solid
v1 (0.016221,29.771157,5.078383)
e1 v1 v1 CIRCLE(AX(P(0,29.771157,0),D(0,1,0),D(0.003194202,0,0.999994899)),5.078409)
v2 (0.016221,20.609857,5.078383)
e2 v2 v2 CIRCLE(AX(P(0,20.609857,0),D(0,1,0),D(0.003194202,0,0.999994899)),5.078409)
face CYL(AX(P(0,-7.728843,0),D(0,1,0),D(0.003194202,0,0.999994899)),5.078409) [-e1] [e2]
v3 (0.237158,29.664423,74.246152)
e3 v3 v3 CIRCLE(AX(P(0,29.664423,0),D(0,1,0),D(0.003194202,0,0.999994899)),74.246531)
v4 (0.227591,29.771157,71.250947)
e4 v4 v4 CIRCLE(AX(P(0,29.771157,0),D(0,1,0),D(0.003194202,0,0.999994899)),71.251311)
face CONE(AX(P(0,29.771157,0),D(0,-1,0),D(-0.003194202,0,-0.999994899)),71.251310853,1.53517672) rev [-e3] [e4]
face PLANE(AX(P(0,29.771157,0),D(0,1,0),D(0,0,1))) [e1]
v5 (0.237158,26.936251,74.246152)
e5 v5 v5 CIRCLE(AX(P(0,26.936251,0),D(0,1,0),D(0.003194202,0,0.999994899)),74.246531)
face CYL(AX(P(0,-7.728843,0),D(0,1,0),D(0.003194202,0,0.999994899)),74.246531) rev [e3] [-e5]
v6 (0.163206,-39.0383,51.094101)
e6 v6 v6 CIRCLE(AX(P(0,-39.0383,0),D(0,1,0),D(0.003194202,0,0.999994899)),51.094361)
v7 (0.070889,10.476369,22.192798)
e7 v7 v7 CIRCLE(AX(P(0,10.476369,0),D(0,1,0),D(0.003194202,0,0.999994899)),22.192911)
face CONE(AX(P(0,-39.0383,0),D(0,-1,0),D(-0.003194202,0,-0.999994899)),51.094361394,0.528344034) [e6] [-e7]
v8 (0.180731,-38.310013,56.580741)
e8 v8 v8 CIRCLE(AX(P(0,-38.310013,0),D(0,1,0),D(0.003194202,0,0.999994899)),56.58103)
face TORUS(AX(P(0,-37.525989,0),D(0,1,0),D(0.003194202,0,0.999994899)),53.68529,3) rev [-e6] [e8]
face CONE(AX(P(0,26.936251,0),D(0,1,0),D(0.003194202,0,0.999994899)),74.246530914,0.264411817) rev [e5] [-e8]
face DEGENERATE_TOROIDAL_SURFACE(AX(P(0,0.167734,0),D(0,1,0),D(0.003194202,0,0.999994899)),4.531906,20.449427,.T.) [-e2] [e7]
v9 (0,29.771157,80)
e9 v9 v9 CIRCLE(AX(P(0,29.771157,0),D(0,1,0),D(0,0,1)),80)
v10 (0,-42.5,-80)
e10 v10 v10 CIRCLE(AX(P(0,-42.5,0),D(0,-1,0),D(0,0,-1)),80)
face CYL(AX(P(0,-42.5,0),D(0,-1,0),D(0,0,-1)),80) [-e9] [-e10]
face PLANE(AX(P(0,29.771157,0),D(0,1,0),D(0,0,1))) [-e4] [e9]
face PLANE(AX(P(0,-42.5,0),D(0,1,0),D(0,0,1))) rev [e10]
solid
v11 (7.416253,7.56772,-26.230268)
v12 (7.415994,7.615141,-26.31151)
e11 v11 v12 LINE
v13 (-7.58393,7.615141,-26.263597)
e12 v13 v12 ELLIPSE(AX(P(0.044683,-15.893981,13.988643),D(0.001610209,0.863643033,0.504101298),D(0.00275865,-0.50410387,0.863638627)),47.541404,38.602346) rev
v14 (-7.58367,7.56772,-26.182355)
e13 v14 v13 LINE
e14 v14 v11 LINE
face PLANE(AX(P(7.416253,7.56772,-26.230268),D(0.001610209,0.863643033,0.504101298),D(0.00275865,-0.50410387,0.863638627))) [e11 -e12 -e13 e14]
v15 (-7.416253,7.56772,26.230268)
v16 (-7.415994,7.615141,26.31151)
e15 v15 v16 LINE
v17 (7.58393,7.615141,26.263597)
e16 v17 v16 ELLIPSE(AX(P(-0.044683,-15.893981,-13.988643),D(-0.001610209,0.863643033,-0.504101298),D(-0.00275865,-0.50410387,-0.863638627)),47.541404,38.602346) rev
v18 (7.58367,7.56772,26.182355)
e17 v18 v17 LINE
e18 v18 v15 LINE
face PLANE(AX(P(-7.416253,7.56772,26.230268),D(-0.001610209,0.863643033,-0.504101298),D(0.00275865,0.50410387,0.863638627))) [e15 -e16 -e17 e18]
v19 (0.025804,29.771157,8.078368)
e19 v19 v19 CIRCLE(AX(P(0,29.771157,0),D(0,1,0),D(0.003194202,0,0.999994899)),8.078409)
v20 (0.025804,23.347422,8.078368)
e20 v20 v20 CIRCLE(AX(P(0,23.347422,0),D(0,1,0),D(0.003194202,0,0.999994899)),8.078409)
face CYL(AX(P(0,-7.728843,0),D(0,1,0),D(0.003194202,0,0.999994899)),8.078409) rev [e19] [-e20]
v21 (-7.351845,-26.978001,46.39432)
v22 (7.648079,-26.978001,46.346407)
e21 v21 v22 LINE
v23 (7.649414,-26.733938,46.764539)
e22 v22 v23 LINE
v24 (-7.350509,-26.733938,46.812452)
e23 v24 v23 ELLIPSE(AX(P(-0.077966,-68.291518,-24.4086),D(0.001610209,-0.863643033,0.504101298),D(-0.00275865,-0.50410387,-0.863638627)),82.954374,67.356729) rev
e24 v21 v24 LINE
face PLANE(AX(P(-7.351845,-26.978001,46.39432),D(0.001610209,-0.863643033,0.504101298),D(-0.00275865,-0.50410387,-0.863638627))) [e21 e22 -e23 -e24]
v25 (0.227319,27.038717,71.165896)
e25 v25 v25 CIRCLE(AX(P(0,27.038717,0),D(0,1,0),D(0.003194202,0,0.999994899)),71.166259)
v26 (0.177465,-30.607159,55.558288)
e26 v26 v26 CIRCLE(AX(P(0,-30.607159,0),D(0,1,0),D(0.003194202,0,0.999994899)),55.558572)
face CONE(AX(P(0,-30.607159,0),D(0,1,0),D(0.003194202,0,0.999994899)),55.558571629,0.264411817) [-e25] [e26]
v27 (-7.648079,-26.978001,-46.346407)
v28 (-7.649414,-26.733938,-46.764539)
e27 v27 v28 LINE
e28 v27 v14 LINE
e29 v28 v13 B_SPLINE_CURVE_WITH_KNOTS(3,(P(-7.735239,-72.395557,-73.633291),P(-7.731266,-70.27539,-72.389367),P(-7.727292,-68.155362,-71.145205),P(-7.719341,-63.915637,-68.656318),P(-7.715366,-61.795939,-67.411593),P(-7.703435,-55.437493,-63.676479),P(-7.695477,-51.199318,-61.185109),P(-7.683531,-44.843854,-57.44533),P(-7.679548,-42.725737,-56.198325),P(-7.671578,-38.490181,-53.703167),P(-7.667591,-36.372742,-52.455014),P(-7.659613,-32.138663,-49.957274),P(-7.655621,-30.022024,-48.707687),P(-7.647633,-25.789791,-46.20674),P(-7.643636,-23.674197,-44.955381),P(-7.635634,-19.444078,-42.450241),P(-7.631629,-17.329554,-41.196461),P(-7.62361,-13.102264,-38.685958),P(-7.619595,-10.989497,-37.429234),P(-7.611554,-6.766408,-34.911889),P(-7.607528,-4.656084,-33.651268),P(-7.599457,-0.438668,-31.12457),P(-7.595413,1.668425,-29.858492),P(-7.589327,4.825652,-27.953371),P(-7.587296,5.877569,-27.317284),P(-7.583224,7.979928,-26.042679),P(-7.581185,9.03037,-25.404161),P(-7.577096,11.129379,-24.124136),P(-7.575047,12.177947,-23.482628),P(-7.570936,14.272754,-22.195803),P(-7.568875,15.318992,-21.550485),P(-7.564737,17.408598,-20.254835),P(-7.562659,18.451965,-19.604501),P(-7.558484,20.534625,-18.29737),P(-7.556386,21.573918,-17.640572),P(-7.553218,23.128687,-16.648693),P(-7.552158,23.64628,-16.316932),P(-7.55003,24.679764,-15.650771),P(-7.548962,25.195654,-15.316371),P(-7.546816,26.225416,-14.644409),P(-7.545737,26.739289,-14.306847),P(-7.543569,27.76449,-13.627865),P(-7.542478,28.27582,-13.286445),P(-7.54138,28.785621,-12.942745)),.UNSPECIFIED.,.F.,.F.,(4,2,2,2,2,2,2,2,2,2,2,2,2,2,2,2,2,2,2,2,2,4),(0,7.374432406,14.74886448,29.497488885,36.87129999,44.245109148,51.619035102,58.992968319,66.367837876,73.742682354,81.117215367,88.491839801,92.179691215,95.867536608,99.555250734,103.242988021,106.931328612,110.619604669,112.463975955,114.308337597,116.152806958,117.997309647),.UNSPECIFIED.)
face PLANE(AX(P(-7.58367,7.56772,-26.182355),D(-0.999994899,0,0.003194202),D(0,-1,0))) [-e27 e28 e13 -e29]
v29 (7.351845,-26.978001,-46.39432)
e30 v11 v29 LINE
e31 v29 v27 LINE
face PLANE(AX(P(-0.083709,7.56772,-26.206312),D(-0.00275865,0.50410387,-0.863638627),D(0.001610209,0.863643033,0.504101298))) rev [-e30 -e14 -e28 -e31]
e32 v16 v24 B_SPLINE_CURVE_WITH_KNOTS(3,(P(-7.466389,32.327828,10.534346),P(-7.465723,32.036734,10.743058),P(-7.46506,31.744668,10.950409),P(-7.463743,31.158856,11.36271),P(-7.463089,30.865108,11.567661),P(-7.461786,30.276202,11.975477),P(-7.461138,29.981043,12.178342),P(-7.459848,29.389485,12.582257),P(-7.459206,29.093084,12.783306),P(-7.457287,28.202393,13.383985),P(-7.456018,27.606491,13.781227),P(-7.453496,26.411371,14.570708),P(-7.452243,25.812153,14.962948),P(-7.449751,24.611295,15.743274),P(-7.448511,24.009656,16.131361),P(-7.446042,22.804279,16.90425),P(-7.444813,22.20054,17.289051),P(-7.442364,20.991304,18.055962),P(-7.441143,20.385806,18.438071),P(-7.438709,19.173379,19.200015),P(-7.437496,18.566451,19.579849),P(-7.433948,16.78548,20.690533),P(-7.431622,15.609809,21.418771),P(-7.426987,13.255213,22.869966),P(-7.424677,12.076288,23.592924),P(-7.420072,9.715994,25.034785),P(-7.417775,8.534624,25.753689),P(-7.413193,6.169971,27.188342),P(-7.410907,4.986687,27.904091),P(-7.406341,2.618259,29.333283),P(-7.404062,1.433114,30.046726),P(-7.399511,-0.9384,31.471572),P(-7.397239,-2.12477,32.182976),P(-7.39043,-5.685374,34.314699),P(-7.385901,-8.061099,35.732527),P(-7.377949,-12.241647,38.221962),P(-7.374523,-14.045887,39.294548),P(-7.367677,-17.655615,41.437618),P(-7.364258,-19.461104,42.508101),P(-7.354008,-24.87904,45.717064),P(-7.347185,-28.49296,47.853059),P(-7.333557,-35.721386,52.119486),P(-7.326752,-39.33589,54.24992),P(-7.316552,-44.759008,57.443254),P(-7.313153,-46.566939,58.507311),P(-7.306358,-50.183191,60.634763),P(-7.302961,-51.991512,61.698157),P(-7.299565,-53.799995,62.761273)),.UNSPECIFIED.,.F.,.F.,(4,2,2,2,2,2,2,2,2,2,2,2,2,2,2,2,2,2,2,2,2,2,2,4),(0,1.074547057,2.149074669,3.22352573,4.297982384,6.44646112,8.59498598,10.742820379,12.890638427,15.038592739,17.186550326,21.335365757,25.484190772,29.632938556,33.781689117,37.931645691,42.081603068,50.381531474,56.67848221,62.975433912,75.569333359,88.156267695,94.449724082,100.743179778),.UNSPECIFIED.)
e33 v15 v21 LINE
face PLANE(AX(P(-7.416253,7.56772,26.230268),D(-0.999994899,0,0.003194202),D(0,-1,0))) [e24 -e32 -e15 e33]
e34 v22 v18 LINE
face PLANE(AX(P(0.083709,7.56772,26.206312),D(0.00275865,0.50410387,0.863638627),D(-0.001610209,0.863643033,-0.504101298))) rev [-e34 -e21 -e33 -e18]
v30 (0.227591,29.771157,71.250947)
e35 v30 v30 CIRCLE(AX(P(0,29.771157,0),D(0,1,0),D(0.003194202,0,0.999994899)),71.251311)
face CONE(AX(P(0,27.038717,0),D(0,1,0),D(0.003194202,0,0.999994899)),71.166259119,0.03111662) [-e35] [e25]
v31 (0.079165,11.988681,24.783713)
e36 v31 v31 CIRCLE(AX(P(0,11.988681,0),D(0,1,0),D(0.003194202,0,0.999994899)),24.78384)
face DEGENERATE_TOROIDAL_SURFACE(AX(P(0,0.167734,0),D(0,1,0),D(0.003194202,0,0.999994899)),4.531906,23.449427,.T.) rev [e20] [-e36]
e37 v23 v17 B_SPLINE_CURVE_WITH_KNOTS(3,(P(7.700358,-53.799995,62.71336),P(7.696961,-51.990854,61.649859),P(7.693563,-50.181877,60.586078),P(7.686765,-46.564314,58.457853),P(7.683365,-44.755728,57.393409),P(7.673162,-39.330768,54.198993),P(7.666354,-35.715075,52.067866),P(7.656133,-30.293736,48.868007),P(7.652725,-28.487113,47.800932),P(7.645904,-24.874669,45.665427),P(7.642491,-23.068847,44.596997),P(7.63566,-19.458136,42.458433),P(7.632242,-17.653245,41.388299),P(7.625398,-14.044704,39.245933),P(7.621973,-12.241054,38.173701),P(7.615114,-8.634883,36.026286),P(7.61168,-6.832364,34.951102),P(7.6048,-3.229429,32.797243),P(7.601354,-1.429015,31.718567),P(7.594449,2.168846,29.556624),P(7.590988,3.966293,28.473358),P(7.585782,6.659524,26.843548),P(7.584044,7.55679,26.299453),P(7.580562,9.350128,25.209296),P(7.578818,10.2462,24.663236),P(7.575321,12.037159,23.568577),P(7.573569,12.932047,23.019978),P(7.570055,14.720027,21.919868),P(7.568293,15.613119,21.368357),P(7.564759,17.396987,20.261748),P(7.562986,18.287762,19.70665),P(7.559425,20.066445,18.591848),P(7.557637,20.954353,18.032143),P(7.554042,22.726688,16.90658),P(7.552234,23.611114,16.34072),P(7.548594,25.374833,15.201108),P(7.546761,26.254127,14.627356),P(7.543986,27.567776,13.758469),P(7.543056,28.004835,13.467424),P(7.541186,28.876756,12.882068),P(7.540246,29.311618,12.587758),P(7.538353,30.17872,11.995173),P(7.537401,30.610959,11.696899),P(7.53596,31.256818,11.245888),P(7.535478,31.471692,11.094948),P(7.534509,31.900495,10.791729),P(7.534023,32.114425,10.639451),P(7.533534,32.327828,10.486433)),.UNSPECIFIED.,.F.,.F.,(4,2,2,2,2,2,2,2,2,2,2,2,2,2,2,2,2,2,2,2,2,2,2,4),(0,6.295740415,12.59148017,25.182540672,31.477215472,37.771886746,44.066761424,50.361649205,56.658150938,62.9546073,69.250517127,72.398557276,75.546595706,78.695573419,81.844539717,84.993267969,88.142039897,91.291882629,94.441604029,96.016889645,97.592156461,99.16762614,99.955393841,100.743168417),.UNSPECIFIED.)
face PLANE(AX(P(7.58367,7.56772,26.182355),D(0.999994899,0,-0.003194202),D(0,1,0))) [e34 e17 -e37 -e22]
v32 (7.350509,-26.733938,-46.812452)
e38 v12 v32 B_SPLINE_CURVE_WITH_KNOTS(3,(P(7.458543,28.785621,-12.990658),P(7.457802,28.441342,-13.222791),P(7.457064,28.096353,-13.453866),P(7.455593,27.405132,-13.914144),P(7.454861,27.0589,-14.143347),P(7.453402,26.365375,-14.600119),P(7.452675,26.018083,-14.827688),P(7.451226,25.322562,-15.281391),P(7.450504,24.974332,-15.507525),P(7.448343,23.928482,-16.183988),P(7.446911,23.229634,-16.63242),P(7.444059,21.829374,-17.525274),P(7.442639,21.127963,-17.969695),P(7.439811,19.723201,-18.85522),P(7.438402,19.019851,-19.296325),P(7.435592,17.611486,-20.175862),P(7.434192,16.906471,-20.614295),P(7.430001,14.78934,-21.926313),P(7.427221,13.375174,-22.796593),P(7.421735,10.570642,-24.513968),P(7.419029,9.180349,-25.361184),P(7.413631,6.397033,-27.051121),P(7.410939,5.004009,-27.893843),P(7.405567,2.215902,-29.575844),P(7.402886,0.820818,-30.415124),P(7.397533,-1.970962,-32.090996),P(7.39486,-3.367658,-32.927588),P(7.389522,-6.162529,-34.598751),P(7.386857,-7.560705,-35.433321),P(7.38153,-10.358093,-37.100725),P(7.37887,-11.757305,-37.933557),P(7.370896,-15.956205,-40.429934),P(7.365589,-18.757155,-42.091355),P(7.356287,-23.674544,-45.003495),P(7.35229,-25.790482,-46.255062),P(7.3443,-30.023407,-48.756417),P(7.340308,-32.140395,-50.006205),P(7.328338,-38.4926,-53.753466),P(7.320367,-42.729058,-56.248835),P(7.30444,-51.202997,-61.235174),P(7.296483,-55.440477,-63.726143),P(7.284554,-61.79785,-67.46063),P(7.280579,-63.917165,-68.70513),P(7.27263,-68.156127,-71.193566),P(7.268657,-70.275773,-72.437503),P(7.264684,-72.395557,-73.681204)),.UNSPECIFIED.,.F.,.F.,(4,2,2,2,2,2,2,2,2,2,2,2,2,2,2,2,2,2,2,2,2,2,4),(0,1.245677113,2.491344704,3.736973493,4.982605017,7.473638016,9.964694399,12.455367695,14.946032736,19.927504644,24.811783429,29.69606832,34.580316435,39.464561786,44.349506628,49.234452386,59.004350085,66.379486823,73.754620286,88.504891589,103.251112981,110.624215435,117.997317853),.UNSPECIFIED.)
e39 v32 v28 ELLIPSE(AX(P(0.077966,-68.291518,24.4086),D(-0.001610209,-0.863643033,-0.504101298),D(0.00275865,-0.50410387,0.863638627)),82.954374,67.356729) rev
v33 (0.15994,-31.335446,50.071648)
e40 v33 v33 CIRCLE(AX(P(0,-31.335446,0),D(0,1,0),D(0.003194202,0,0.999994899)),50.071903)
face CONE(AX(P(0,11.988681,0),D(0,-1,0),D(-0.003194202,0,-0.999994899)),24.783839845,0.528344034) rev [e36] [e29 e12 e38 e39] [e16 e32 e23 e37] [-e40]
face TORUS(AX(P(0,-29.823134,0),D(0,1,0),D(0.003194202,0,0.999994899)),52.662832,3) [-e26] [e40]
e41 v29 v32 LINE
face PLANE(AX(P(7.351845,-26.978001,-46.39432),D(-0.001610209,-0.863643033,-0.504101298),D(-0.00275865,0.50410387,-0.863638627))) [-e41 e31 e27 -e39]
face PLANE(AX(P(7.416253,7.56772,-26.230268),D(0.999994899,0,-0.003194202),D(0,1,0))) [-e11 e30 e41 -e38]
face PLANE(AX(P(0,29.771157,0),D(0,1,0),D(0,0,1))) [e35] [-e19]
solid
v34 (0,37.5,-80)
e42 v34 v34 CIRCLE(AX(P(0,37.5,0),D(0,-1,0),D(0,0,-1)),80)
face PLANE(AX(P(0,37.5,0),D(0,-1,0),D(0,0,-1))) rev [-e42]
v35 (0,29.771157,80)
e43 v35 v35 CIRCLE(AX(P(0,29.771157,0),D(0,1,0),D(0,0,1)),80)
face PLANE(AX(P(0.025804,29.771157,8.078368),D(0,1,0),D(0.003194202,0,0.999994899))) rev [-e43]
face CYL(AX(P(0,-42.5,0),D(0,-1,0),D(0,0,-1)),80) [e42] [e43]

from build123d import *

# Parameters (mm, degrees)
SKETCH1_W       = 80
SKETCH1_H       = 80
CAVITY1_START   = -7.5
CAVITY1_2_DEPTH = 15


with BuildPart() as part:
    # Sketch1 → Revolve1 (revolve)
    with BuildSketch(Plane.XY, mode=Mode.PRIVATE) as revolve1_sk:
        with Locations((-40, -2.5)):
            Rectangle(SKETCH1_W, SKETCH1_H)
    revolve(revolve1_sk.sketch.rotate(Axis((0, -42.5, 0), (0, 1, 0)), 270), axis=Axis((0, -42.5, 0), (0, 1, 0)))

    # Cavity1: read off the stored shape, not the designer's step
    # Cavity1 outline → Cavity1 (revolve, cut)
    with BuildSketch(Plane.XY):
        with BuildLine():
            Line((22.192910746, 10.476369291), (51.094361394, -39.038300205))
            ThreePointArc((51.094361394, -39.038300205), (54.080040721, -40.499903904), (56.581029647, -38.310013312))
            Line((56.581029647, -38.310013312), (74.246530914, 26.936250812))
            Line((74.246530914, 26.936250812), (74.246530914, 29.664423233))
            Line((74.246530914, 29.664423233), (71.251310853, 29.771156937))
            Line((71.251310853, 29.771156937), (71.166259119, 27.038717428))
            Line((71.166259119, 27.038717428), (55.558571629, -30.607158845))
            ThreePointArc((55.558571629, -30.607158845), (53.057582703, -32.797049437), (50.071903376, -31.335445739))
            Line((50.071903376, -31.335445739), (24.783839845, 11.9886809))
            ThreePointArc((24.783839845, 11.9886809), (17.716997937, 19.559200307), (8.078409083, 23.347421995))
            Line((8.078409083, 23.347421995), (8.078409083, 29.771156937))
            Line((8.078409083, 29.771156937), (5.078409083, 29.771156937))
            Line((5.078409083, 29.771156937), (5.078409083, 20.60985703))
            ThreePointArc((5.078409083, 20.60985703), (14.950650083, 17.764007092), (22.192910746, 10.476369291))
        make_face()
    revolve(axis=Axis((0, 0, 0), (0, 1, 0)), mode=Mode.SUBTRACT)

    # Cavity1 2 outline → Cavity1 2 (add)
    with BuildSketch(Plane(origin=(0, 0, 0), x_dir=(0, 1, 0), z_dir=(0.9999948985251625, 0, -0.0031942015668954887)).offset(CAVITY1_START)):
        Polygon((7.567720421, -26.206445295), (-26.978000902, -46.370600081), (-26.473897032, -47.234243114), (-26.026928788, -48), (9, -48), (9, -28.660261568), (8.071824291, -27.070088328), align=None)
        Polygon((8.071824291, 27.070088328), (9, 28.660261568), (9, 48), (-26.026928788, 48), (-26.473897032, 47.234243114), (-26.978000902, 46.370600081), (7.567720421, 26.206445295), align=None)
    extrude(amount=CAVITY1_2_DEPTH)


with BuildPart() as body_2:
    # Split1: the piece on the far side of the plane
    add(part.part)
    split(bisect_by=Plane.ZX.offset(29.771156937), keep=Keep.BOTTOM)


with BuildPart() as part_1:
    add(part.part)

    # Split1
    split(bisect_by=Plane.ZX.offset(29.771156937), keep=Keep.TOP)


solid = Compound([body_2.part, part_1.part])
